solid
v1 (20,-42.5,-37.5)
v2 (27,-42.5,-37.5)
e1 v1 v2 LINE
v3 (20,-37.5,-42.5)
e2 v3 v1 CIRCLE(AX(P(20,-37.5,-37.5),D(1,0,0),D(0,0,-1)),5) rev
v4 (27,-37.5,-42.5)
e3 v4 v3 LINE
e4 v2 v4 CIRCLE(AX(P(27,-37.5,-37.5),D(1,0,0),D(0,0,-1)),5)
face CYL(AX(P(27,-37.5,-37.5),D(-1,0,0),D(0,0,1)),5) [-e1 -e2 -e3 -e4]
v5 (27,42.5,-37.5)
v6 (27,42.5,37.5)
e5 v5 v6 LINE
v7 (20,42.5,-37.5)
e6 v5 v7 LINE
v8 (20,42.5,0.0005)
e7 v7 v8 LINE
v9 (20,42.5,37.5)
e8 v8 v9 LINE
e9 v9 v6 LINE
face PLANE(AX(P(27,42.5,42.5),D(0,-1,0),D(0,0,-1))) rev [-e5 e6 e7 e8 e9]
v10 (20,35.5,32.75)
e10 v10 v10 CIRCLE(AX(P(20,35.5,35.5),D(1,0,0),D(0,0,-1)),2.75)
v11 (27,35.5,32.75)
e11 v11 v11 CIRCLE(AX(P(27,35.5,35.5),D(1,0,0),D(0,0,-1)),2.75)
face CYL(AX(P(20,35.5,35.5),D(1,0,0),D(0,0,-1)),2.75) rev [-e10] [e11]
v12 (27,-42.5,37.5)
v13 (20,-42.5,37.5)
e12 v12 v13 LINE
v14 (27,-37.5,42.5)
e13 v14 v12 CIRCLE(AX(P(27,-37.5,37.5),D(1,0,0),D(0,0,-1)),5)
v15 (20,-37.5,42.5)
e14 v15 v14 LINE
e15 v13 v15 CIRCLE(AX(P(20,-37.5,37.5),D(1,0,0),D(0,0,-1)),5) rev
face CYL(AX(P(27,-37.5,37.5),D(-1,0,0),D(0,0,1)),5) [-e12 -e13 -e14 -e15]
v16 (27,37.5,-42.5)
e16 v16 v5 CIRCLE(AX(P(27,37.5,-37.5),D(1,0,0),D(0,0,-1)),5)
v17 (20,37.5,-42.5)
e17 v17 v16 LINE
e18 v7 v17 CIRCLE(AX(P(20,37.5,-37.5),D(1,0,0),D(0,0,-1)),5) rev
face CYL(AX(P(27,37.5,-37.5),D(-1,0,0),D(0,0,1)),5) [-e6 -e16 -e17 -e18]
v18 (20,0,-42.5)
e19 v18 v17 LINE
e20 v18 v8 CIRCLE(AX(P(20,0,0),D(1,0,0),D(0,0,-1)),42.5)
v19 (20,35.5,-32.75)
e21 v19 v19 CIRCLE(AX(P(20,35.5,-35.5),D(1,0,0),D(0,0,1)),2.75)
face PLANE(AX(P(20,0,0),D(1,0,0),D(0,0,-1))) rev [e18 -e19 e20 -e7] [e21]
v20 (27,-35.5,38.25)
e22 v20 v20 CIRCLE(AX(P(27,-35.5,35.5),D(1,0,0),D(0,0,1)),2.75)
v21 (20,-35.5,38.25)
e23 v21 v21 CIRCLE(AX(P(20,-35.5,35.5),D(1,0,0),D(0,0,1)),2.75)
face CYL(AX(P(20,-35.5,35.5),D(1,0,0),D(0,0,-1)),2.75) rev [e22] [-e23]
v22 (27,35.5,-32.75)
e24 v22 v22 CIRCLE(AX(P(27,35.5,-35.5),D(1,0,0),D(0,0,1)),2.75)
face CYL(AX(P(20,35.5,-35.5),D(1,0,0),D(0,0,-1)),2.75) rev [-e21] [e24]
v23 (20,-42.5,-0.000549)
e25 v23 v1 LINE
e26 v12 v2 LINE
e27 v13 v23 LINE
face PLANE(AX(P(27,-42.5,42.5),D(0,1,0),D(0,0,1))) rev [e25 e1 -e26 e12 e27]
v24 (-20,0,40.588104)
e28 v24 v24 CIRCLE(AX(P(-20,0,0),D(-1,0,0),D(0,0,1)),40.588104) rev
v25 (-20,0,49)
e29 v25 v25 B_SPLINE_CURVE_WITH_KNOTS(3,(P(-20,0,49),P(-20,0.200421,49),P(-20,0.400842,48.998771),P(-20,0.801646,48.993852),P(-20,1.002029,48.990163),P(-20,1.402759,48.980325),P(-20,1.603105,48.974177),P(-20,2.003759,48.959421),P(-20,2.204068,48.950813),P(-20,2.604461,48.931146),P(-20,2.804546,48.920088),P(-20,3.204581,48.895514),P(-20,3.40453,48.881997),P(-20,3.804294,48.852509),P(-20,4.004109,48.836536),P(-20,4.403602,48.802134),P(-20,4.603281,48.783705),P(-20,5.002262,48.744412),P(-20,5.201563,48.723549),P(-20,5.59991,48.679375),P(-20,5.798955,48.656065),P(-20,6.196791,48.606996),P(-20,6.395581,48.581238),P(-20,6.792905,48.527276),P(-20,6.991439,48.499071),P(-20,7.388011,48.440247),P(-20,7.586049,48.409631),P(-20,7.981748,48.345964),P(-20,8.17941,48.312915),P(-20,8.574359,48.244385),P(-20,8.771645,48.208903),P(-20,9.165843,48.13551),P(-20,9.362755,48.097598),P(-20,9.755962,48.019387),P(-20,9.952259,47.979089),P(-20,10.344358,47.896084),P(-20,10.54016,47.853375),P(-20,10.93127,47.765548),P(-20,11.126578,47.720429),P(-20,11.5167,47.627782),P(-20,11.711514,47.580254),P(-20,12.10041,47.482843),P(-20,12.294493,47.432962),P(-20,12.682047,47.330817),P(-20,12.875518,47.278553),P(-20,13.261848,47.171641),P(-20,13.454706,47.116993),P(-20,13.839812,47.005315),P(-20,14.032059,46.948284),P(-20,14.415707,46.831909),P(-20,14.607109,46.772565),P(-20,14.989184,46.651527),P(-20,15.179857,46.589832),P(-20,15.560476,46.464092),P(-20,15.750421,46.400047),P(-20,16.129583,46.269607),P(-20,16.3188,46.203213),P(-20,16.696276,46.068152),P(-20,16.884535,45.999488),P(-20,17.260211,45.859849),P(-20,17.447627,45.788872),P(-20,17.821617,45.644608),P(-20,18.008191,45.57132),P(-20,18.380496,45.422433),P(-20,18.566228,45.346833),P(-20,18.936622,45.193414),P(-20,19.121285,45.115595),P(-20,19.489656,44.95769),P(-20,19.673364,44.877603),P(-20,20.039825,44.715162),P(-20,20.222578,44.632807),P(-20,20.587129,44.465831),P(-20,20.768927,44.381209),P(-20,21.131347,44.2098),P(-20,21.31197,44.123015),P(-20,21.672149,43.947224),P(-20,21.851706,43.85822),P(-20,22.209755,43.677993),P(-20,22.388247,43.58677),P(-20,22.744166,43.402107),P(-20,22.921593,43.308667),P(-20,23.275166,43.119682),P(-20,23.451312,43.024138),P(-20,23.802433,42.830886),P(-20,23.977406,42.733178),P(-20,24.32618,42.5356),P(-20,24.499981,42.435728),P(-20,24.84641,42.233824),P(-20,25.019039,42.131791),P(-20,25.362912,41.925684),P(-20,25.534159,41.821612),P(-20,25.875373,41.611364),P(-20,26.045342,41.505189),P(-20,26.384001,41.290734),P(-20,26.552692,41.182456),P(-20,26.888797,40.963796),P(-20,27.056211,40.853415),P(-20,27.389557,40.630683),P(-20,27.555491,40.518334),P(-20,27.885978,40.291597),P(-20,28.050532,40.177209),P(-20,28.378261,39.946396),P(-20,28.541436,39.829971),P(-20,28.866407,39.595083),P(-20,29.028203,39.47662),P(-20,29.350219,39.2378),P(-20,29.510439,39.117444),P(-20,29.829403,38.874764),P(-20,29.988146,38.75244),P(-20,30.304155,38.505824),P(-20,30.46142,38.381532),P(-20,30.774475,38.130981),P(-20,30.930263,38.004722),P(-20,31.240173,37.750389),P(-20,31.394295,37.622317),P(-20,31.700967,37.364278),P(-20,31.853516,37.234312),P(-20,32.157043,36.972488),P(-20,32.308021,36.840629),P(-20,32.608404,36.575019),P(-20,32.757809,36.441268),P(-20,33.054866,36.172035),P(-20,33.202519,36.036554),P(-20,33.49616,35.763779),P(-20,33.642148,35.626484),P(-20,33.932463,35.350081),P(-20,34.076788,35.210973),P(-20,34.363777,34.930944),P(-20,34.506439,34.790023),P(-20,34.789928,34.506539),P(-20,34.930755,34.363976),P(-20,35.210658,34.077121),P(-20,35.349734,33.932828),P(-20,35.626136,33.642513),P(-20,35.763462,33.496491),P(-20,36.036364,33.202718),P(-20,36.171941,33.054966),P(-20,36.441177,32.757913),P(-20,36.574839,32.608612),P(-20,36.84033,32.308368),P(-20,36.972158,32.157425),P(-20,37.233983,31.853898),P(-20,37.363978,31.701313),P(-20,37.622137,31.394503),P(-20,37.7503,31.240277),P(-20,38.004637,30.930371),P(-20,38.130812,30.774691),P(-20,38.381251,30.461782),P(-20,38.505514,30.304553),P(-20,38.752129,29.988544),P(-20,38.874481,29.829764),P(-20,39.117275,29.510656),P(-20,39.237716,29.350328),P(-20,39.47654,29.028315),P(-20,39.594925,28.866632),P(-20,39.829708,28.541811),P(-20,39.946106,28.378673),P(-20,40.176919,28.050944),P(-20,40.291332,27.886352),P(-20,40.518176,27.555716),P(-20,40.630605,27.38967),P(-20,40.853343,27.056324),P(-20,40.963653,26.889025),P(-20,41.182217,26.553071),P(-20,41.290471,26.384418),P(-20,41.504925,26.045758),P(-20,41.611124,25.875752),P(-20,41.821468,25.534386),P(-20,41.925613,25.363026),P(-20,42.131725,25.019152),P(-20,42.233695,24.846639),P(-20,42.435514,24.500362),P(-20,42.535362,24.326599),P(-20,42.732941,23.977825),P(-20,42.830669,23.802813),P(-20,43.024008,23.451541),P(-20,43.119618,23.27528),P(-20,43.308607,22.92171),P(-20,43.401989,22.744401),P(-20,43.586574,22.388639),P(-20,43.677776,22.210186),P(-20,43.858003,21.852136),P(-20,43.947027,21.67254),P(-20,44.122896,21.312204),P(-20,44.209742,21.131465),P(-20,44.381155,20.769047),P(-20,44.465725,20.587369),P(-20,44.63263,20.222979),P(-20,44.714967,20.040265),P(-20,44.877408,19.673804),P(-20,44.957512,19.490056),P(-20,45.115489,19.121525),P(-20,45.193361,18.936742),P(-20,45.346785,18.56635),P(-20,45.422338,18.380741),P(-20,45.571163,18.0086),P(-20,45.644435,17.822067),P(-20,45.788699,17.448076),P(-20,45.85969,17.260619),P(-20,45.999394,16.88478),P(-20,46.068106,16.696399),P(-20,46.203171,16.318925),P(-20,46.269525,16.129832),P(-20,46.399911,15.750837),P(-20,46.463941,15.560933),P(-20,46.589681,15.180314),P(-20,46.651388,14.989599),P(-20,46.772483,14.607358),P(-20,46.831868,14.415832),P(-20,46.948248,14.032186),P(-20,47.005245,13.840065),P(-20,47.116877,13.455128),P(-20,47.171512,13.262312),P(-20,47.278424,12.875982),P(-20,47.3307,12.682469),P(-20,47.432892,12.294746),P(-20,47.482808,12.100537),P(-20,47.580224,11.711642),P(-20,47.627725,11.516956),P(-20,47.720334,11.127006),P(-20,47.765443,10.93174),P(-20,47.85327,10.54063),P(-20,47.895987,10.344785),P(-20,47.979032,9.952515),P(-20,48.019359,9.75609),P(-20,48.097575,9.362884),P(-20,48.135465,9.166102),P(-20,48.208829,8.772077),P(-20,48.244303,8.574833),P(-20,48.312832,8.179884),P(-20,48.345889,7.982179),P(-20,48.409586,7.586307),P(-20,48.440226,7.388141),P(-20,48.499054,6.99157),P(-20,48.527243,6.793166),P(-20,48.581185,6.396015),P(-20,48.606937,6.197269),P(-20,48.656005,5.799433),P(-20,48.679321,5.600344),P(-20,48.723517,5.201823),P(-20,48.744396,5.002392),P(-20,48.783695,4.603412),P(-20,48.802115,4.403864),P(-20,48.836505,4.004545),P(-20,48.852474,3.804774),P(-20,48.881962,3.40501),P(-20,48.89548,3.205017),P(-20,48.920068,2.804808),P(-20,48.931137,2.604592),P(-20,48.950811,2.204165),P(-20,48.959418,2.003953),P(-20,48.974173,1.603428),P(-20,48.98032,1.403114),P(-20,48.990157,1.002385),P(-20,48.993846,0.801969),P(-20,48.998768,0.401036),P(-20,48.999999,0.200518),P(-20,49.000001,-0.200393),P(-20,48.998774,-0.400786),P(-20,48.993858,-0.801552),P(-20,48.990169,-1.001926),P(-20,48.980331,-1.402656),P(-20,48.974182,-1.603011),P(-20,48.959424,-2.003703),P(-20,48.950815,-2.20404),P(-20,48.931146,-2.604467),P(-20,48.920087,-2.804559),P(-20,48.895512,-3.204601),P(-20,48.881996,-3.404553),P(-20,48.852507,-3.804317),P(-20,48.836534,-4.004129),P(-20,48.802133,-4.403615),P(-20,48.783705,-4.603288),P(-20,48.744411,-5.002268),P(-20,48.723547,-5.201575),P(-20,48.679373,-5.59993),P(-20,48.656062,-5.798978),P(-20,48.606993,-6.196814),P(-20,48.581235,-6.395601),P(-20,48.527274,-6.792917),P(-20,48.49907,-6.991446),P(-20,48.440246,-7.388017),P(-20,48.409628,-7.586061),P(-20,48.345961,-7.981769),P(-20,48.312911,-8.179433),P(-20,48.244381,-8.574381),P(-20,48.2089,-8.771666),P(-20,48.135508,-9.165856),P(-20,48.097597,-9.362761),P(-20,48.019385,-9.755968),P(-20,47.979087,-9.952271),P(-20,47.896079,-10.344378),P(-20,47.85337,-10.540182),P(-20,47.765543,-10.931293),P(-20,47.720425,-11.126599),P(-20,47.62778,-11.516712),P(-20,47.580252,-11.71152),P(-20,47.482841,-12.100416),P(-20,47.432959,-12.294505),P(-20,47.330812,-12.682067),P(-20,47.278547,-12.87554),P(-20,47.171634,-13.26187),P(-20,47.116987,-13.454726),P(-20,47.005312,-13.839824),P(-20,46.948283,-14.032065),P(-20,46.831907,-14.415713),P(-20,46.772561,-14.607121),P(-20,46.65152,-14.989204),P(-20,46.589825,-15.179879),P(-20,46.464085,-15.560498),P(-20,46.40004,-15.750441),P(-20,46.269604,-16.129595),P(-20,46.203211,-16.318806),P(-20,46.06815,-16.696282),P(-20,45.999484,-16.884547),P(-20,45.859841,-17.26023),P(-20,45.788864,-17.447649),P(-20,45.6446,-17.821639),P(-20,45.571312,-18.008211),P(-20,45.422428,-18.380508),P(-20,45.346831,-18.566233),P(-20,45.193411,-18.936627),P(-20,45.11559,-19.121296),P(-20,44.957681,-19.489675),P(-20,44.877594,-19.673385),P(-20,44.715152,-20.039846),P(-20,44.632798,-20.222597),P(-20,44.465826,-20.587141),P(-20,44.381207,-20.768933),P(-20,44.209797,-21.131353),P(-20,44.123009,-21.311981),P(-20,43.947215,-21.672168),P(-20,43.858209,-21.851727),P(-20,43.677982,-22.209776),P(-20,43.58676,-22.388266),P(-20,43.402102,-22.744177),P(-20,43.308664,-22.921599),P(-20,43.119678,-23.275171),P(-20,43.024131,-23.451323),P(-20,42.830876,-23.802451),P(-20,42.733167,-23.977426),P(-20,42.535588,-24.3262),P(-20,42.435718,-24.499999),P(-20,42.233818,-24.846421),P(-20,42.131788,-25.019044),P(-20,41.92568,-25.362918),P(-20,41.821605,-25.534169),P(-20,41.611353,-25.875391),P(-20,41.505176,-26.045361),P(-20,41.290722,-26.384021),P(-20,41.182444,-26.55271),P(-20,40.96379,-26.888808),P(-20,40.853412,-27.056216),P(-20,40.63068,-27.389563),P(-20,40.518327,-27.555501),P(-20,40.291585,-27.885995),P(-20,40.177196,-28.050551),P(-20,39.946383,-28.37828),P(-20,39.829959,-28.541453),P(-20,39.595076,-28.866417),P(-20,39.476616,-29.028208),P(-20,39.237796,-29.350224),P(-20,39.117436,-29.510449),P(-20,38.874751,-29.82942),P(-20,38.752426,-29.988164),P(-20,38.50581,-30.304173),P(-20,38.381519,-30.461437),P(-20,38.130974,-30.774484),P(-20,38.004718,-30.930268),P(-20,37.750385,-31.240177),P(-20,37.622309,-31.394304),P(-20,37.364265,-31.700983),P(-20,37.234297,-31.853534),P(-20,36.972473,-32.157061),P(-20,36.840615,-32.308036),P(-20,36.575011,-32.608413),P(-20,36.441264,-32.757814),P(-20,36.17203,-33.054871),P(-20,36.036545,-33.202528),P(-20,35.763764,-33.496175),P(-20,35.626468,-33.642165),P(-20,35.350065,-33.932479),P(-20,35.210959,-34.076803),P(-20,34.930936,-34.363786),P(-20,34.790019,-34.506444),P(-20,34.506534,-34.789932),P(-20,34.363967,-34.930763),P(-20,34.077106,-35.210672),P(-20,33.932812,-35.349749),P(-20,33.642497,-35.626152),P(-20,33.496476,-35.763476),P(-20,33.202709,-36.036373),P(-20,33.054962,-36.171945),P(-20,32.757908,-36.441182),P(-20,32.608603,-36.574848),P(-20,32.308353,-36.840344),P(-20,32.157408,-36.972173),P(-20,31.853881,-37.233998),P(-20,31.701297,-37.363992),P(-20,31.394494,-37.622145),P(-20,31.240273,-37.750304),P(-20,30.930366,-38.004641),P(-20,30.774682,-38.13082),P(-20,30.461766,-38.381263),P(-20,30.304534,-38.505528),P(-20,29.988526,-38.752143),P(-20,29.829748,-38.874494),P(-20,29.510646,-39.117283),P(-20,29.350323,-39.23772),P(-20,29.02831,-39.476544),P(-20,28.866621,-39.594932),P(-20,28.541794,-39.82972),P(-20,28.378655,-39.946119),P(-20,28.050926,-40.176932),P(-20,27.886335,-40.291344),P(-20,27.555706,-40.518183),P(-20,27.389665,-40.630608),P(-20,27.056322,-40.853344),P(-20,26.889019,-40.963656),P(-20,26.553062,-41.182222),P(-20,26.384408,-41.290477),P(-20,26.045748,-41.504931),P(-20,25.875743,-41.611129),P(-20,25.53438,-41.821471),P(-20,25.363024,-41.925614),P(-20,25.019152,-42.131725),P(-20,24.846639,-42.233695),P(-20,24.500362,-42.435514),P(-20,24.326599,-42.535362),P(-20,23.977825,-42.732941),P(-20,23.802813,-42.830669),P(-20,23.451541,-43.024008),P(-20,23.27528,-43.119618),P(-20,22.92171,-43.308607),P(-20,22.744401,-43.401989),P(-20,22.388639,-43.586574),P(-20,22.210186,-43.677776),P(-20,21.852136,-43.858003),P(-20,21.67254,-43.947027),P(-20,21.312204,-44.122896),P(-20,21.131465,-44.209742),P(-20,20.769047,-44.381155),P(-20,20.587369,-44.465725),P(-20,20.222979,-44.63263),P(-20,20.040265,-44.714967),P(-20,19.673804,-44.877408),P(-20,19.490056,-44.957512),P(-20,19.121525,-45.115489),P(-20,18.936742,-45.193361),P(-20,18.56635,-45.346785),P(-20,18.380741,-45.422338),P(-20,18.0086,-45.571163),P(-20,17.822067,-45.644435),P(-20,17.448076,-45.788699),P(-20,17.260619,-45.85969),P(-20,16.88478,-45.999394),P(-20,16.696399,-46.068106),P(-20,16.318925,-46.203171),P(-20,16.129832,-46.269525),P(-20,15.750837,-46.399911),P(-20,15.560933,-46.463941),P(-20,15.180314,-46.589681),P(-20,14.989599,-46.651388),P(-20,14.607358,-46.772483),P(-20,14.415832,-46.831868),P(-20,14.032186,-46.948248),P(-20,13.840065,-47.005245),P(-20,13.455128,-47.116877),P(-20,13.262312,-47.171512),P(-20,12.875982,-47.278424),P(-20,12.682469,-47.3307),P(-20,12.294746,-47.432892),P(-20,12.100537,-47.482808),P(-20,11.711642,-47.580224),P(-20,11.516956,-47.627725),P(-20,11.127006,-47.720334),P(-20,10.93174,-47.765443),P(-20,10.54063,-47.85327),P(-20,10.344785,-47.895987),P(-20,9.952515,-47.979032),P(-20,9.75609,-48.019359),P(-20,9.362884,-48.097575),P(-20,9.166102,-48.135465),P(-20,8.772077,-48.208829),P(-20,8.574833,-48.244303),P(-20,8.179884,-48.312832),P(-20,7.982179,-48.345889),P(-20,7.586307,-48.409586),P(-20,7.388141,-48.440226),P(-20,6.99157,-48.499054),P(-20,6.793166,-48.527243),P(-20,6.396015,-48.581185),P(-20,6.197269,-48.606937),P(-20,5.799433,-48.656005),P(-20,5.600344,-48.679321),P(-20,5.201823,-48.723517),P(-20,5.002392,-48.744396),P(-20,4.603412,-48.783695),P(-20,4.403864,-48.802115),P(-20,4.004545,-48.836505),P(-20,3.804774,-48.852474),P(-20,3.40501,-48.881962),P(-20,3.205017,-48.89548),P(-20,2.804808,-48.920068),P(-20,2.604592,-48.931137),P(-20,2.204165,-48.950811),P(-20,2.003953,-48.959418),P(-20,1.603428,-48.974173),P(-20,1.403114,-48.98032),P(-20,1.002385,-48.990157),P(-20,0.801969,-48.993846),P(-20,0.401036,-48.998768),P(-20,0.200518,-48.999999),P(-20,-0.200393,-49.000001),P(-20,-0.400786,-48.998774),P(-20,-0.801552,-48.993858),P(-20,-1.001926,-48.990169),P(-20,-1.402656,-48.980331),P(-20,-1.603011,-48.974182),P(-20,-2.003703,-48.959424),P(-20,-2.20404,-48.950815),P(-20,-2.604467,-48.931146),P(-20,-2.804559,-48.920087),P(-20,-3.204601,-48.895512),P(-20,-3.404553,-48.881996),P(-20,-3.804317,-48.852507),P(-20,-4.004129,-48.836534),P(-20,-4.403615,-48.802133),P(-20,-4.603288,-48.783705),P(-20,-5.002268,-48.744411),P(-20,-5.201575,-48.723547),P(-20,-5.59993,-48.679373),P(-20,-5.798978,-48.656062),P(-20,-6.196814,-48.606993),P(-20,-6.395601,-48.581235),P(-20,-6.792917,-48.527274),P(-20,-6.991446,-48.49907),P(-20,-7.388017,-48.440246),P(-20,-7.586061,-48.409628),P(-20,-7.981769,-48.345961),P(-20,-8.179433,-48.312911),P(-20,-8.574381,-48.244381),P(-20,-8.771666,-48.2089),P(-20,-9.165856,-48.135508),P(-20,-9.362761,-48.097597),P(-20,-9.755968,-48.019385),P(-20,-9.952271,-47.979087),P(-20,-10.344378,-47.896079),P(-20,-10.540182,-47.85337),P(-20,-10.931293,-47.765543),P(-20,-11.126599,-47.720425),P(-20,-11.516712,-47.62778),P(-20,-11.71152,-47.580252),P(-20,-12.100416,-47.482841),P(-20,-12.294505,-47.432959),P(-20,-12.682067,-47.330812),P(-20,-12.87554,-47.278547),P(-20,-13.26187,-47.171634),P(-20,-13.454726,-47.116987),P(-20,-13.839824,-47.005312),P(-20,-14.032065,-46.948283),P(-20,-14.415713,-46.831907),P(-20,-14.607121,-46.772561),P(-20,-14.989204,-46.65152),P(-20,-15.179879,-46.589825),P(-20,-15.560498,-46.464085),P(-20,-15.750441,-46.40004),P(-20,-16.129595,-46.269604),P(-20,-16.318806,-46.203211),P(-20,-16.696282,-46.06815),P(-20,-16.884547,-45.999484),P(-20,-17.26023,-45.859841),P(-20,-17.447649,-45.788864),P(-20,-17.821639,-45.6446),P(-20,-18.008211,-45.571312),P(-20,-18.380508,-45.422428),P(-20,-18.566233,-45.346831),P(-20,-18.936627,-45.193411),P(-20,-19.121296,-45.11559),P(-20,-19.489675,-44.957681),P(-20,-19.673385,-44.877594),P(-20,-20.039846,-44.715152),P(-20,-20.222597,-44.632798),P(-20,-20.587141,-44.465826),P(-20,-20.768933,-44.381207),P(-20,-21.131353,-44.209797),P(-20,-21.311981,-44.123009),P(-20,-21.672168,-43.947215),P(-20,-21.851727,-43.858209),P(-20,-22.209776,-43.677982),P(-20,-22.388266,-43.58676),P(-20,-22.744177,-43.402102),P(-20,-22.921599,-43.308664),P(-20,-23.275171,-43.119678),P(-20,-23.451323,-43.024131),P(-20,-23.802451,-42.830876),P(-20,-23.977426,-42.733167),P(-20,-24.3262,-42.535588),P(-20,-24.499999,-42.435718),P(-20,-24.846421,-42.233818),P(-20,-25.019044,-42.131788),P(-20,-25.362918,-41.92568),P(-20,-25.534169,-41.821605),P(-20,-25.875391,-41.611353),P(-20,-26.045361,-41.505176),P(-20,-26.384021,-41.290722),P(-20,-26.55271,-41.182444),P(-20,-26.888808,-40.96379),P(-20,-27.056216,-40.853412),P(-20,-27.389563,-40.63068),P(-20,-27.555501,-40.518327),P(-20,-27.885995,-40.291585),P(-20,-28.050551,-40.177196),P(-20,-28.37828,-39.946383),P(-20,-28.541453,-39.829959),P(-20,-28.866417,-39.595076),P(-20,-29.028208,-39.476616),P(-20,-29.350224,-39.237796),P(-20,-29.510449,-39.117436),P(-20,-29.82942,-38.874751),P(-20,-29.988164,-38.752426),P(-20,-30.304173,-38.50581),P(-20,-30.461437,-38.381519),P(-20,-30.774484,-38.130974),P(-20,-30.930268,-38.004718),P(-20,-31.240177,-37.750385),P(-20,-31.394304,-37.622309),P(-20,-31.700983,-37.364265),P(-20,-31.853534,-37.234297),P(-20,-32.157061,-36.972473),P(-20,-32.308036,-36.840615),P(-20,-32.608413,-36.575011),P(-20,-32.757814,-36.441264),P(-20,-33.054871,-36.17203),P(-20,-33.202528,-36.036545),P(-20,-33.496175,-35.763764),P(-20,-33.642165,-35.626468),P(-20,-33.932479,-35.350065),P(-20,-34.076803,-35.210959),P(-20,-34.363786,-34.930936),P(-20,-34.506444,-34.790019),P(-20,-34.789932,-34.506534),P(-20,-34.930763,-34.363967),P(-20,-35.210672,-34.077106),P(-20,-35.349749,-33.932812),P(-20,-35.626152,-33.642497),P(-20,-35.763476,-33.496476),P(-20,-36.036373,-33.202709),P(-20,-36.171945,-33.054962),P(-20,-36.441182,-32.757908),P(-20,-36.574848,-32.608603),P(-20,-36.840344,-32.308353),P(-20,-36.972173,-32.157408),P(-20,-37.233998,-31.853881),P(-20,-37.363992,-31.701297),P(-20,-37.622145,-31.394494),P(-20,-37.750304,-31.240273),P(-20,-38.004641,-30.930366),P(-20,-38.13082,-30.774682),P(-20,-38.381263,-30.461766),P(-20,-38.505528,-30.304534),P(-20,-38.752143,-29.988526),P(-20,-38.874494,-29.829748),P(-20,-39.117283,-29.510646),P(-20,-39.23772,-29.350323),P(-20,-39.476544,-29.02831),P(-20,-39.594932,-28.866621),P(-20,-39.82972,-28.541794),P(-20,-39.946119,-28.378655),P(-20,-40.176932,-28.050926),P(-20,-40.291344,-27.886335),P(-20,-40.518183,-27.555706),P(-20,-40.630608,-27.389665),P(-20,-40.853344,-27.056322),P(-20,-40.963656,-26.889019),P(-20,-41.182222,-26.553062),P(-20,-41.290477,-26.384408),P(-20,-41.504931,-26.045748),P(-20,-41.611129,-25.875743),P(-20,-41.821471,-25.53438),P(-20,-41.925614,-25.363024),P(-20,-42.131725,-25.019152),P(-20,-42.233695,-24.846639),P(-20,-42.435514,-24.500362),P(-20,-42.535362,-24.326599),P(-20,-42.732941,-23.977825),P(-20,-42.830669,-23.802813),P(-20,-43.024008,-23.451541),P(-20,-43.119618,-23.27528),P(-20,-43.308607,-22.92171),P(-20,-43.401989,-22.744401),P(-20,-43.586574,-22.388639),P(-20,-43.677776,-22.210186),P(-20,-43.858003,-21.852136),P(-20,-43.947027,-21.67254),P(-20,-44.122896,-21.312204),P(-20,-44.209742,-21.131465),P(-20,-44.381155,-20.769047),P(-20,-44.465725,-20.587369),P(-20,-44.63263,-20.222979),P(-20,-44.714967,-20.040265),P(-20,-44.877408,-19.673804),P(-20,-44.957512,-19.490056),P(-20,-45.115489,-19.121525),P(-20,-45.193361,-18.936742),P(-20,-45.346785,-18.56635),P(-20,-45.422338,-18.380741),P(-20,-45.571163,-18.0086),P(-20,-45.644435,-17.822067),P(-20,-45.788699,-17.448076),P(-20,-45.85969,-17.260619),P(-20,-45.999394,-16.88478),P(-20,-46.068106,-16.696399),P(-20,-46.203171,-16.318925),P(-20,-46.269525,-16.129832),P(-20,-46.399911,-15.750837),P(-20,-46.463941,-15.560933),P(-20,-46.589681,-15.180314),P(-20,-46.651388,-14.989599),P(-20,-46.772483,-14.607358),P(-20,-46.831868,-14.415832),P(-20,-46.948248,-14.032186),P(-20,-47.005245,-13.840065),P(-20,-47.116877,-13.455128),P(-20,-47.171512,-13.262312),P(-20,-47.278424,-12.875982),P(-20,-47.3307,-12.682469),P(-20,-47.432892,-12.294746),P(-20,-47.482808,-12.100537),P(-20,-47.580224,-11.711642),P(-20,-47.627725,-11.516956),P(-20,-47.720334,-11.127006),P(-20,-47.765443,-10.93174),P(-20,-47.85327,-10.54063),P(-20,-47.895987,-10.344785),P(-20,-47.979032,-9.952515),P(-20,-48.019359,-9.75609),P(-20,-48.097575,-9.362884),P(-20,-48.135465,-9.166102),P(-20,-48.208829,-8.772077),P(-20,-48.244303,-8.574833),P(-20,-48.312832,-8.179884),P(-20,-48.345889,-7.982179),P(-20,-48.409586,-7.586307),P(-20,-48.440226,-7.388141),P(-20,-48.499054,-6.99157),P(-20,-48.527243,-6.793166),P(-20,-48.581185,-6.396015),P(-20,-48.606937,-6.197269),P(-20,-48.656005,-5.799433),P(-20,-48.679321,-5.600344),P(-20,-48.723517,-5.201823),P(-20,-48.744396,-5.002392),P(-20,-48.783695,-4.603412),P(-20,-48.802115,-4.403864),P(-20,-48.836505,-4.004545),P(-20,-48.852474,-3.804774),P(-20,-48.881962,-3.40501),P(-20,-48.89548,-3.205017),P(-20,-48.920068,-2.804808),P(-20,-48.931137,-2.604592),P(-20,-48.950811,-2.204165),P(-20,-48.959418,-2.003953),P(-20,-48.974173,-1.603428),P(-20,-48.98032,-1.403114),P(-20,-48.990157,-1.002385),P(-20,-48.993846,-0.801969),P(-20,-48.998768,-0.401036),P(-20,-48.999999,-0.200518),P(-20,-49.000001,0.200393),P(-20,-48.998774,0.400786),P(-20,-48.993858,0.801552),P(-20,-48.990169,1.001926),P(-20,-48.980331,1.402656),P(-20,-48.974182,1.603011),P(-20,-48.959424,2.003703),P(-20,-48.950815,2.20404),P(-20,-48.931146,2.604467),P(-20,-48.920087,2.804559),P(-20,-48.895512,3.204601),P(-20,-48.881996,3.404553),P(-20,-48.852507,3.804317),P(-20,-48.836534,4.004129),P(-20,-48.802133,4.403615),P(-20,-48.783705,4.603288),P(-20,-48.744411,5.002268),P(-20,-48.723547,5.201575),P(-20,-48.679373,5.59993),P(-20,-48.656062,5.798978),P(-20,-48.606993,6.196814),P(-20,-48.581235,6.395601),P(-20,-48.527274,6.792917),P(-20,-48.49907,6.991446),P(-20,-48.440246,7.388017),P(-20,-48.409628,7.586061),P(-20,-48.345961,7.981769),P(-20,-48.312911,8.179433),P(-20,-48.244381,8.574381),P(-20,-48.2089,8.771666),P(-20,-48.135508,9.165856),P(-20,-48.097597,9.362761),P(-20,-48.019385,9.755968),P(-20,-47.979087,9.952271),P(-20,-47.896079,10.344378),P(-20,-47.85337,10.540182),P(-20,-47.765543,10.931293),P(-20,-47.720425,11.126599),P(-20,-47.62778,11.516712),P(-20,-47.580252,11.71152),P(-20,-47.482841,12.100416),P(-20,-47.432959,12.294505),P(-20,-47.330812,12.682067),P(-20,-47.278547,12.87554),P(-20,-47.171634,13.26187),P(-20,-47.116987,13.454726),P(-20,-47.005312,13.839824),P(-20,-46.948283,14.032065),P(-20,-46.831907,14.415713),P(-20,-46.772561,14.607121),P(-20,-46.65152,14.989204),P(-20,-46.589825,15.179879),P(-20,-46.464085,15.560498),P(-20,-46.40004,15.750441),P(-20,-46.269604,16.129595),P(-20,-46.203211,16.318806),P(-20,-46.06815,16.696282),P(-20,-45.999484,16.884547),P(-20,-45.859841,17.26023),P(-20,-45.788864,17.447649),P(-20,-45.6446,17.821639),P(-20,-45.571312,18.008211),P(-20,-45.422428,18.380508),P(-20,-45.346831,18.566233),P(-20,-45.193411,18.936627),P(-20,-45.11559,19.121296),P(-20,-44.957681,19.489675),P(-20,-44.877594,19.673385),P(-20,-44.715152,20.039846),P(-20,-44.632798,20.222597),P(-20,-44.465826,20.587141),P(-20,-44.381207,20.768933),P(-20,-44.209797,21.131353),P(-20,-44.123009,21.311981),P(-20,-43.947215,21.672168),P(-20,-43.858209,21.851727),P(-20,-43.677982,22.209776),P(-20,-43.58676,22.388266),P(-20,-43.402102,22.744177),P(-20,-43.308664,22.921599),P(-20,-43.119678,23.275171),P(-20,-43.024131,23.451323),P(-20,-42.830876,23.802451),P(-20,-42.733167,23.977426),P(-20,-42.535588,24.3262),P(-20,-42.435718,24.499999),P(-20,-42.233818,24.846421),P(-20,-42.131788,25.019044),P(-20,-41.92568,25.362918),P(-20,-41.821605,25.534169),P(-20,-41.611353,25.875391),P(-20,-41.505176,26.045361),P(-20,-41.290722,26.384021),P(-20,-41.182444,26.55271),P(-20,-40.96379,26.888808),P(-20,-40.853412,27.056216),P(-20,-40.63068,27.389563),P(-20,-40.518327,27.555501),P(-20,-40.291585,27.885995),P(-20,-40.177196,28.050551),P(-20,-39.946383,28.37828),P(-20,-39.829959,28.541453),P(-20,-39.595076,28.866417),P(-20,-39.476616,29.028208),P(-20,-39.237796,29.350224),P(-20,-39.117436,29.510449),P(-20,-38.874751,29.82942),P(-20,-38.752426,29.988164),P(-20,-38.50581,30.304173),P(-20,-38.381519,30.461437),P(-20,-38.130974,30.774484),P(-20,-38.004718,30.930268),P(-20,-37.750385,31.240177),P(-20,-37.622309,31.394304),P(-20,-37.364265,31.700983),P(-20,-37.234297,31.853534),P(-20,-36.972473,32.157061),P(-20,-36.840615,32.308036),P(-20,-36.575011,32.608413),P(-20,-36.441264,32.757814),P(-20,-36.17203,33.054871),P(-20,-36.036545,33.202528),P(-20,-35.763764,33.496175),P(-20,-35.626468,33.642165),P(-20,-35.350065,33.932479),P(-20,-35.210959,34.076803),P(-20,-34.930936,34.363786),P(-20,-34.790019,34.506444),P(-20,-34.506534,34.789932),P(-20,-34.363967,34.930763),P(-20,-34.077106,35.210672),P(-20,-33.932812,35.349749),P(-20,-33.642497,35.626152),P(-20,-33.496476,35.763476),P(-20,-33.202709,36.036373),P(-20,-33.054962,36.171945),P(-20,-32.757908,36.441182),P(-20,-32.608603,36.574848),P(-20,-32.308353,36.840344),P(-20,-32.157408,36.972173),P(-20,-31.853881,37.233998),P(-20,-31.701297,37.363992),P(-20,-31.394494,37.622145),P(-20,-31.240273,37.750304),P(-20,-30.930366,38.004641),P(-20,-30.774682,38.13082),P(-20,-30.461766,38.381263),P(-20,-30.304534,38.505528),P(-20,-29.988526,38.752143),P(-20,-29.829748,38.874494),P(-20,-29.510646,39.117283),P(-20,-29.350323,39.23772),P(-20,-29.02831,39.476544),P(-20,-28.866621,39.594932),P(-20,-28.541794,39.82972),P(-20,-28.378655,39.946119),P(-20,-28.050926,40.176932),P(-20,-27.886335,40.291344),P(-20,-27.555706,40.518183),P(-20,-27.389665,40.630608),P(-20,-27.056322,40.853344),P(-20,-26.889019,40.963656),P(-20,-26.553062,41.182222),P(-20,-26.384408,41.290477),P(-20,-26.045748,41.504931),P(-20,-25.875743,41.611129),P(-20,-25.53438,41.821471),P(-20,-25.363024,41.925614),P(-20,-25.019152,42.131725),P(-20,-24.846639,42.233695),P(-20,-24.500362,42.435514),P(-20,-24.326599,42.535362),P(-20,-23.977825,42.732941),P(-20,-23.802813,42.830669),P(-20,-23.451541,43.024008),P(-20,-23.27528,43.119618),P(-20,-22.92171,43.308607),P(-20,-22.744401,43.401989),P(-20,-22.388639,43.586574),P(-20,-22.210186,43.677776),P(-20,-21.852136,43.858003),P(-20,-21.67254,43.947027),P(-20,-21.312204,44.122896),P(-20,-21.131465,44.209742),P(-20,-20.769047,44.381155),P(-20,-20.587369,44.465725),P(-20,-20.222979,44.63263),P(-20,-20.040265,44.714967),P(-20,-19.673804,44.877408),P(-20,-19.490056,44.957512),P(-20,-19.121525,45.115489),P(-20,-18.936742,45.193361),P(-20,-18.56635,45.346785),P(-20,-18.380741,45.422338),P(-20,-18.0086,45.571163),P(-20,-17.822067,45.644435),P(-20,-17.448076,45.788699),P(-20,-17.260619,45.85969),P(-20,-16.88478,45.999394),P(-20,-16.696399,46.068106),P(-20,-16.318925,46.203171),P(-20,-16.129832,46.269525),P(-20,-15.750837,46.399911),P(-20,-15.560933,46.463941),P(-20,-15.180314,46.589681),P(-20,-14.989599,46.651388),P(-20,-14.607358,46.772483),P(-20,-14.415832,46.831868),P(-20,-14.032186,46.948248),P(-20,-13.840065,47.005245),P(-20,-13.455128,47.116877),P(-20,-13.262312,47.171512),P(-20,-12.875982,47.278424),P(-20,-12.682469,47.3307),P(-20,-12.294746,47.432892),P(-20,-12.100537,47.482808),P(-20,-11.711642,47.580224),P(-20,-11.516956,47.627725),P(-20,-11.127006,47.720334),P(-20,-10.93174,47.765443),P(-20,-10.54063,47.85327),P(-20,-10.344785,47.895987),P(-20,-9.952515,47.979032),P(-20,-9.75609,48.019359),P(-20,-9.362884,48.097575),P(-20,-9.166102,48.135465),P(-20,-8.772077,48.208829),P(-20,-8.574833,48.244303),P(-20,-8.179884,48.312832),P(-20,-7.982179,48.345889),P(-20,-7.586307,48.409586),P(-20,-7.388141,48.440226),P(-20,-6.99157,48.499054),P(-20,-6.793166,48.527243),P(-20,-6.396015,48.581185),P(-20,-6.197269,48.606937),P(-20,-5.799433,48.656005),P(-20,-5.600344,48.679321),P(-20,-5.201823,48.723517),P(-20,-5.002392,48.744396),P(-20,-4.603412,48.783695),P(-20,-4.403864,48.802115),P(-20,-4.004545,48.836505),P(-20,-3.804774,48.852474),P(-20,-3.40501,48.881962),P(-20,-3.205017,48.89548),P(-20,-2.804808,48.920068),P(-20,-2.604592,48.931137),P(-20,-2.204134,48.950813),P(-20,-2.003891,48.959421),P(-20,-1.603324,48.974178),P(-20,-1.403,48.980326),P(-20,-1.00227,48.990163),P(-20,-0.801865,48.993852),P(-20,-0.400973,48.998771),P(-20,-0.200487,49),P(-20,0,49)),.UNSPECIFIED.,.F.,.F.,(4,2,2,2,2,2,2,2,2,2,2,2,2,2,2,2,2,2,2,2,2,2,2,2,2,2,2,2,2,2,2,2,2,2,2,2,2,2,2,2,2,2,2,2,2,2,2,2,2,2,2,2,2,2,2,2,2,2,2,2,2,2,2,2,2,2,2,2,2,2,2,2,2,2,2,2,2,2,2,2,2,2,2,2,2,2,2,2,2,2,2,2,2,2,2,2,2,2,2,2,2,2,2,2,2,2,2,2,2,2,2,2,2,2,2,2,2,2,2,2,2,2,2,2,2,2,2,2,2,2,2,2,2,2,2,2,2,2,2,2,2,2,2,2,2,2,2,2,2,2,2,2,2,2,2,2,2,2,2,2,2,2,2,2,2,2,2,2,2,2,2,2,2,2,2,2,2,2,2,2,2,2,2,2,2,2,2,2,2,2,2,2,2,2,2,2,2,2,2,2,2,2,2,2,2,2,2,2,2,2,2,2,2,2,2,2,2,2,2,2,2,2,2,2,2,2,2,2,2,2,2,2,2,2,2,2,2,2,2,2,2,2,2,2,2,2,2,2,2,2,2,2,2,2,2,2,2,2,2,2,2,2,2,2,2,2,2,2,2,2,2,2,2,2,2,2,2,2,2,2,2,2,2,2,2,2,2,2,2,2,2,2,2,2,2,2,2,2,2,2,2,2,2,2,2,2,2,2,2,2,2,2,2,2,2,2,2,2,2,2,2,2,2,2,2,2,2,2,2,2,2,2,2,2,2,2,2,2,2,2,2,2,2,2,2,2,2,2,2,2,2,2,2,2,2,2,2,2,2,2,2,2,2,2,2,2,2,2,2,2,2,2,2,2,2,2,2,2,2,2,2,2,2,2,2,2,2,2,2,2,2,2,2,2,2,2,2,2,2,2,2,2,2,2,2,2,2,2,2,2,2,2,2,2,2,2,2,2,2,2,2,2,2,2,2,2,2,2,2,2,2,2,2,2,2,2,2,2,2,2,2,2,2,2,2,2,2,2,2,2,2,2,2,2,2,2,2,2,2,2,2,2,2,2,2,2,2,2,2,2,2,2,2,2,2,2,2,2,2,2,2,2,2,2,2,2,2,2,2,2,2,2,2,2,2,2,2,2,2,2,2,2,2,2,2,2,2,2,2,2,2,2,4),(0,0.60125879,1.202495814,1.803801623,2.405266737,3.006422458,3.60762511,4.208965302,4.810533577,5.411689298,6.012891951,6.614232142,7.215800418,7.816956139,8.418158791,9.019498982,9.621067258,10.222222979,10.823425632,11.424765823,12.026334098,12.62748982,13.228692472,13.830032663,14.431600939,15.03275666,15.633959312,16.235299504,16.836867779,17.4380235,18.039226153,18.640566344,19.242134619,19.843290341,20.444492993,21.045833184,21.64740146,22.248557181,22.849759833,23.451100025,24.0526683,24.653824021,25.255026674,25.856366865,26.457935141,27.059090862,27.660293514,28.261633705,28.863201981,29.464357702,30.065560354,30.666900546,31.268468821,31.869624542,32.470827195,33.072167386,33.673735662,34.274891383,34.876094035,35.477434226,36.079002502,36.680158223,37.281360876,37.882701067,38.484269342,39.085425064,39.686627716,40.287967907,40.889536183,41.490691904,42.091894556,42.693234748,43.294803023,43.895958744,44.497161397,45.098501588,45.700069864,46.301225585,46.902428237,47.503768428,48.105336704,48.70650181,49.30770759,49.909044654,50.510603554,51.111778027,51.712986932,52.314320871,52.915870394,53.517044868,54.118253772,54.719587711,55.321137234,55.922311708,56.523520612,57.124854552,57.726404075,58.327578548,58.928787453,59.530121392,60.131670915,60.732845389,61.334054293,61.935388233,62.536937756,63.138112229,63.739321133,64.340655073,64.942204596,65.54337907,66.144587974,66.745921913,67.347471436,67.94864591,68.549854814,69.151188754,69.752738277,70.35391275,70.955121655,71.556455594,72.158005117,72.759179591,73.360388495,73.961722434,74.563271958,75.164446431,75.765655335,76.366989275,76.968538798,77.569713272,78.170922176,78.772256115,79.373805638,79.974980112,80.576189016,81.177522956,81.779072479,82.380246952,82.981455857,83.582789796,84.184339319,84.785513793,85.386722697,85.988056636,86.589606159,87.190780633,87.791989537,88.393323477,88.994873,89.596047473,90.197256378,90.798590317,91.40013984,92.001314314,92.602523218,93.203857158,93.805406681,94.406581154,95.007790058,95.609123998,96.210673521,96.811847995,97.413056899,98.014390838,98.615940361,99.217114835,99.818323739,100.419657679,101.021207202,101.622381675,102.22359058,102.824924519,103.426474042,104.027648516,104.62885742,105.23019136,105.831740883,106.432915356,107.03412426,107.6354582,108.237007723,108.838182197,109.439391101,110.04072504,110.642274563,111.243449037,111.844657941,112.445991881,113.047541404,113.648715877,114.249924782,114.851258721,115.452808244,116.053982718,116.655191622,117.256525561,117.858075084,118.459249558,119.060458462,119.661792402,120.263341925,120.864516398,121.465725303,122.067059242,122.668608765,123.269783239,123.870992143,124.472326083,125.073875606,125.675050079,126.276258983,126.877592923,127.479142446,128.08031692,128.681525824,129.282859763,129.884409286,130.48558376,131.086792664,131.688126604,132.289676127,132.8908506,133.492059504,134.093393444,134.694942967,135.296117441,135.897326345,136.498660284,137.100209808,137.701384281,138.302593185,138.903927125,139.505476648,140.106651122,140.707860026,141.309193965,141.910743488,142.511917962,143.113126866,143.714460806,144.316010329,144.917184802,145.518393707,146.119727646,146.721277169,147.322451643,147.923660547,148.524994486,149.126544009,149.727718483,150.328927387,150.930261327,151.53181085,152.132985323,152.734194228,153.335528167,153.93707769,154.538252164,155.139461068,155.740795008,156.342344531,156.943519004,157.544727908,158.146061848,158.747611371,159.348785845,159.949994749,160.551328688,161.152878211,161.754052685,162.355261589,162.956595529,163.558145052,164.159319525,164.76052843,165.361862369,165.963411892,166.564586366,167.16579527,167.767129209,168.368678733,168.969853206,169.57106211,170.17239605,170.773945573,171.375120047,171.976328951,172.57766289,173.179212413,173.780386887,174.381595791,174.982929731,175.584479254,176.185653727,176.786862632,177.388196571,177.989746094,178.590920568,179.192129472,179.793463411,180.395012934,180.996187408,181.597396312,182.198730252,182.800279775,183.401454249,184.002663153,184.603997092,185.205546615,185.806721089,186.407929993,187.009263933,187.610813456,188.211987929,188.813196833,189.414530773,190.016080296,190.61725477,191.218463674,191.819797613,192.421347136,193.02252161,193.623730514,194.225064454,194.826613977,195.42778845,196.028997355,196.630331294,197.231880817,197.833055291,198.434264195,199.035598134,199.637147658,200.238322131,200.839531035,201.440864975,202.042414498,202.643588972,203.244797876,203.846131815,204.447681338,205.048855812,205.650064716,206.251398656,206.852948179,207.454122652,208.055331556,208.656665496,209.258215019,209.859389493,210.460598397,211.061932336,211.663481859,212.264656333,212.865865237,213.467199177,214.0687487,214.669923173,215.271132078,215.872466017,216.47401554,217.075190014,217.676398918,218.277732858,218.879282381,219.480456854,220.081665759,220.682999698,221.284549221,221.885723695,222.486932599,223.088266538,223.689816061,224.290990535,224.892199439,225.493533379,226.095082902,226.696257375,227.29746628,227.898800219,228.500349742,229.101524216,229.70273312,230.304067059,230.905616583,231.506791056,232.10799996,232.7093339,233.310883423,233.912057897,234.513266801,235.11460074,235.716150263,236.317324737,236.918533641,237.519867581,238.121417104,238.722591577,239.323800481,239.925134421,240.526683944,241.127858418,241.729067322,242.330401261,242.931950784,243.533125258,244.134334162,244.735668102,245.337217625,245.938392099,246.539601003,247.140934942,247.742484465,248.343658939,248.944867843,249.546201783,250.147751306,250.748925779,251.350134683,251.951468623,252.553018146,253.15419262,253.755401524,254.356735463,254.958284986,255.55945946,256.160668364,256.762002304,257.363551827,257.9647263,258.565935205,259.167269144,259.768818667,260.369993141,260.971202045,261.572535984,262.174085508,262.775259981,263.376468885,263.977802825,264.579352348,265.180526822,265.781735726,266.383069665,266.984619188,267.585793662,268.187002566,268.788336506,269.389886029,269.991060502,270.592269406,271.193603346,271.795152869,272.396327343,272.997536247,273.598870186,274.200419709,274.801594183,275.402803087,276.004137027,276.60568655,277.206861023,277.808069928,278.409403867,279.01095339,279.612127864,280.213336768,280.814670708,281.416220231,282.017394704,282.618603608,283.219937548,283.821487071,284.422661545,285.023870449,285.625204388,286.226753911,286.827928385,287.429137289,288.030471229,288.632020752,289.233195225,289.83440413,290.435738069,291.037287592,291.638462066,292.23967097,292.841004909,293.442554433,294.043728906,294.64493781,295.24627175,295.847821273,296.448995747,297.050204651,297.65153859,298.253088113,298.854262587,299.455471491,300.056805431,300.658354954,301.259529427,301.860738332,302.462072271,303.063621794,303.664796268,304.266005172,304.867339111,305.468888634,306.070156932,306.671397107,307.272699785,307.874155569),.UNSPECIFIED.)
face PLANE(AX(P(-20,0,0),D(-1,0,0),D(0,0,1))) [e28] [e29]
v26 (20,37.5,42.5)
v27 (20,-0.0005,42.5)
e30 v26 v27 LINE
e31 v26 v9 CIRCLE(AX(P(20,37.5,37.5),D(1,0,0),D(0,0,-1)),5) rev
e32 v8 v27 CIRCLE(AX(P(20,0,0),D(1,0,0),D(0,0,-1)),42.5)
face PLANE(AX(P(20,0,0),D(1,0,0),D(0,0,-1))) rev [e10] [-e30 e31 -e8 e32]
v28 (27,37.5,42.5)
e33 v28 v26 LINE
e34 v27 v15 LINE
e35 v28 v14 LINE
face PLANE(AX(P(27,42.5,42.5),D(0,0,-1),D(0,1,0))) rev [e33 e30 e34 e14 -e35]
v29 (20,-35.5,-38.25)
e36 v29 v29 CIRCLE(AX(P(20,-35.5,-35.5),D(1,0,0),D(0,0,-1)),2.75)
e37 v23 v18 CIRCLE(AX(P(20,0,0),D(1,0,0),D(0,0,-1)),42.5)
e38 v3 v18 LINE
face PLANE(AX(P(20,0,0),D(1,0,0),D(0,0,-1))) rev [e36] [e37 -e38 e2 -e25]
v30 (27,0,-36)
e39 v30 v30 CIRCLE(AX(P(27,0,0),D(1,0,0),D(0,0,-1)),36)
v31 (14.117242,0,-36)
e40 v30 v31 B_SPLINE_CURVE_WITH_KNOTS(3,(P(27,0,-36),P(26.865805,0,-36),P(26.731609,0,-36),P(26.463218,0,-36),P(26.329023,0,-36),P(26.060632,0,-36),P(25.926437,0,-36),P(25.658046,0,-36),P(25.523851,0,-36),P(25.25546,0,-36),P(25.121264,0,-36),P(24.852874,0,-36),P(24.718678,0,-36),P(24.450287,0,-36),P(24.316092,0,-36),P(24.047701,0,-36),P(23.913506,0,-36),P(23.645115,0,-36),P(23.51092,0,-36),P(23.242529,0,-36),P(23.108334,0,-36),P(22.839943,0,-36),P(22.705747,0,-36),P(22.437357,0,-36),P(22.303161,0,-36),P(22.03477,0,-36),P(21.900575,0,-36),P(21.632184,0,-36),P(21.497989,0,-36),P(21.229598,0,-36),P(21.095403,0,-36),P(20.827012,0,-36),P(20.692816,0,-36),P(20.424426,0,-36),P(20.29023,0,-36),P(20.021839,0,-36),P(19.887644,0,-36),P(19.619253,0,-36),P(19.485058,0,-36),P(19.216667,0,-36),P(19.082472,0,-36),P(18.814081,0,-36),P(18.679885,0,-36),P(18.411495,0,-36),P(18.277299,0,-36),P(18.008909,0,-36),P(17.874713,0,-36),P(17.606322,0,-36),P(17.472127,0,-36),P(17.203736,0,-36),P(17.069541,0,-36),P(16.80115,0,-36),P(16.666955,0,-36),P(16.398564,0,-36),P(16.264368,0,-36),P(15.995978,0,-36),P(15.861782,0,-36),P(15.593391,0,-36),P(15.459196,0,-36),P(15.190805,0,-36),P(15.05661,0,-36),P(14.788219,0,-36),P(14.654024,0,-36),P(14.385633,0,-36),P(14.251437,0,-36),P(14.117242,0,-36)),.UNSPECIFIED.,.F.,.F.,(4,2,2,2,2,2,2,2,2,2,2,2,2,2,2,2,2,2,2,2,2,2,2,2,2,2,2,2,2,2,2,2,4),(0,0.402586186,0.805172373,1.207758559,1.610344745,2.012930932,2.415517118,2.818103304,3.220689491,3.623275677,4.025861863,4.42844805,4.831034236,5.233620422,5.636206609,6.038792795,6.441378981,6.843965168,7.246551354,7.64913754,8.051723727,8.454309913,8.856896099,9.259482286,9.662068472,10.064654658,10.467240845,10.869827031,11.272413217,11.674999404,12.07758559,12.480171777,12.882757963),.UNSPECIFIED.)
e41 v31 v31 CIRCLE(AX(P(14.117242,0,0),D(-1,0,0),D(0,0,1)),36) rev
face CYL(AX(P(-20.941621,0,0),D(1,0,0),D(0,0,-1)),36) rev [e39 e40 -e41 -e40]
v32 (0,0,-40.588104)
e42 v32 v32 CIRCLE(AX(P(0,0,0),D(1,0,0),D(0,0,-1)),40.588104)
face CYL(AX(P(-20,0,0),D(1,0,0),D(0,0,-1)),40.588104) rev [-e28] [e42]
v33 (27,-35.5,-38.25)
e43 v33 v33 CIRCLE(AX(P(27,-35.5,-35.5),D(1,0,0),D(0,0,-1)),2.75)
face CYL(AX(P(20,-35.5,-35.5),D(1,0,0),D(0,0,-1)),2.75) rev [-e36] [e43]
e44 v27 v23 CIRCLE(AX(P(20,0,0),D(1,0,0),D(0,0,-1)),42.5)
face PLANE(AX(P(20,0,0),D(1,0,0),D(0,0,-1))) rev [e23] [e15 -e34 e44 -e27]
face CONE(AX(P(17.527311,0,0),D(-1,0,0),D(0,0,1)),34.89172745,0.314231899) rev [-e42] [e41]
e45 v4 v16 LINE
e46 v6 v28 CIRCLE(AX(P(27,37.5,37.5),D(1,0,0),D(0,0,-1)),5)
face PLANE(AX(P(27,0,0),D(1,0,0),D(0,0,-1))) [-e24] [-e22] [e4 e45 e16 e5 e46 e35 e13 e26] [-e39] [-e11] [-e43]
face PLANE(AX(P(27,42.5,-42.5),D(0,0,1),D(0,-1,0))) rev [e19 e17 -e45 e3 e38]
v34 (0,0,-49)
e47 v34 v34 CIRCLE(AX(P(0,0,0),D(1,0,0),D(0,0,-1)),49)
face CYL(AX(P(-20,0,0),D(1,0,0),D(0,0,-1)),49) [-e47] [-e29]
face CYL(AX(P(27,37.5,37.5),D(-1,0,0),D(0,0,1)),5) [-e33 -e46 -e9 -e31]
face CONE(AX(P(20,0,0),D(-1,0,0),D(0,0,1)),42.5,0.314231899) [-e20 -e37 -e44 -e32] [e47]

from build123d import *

# Parameters (mm, degrees)
SKETCH23_W          = 85
SKETCH23_H          = 85
BOSS_EXTRUDE1_DEPTH = 7
SKETCH26_R          = 49
SKETCH26_R_2        = 40.588103662
BOSS_EXTRUDE2_DEPTH = 20
SKETCH28_R          = 36
CUT_EXTRUDE5_DEPTH  = 84.731714422
SKETCH29_R          = 2.75
CUT_EXTRUDE6_DEPTH  = 7
FILLET1_R           = 5
FILLET2_R           = 5


# Read off the part's stored shape, not the designer's step: Loft-Thin1
with BuildPart() as part:
    # Loft-Thin1 outline → Loft-Thin1 (revolve)
    with BuildSketch(Plane.YX):
        Polygon((34.088103662, 20), (40.588103662, 0), (49, 0), (42.5, 20), align=None)
    revolve(axis=Axis((0, 0, 0), (1, 0, 0)))

    # Sketch23 → Boss-Extrude1 (add)
    with BuildSketch(Plane(origin=(20, 0, 0), x_dir=(0, 0, -1), z_dir=(1, 0, 0))):
        Rectangle(SKETCH23_W, SKETCH23_H)
    extrude(amount=BOSS_EXTRUDE1_DEPTH)

    # Sketch26 → Boss-Extrude2 (add)
    with BuildSketch(Plane.ZY):
        with Locations(Location((0, 0, 0), (0, 0, 180))):
            Circle(SKETCH26_R)
        with Locations(Location((0, 0, 0), (0, 0, 180))):
            Circle(SKETCH26_R_2, mode=Mode.SUBTRACT)
    extrude(amount=BOSS_EXTRUDE2_DEPTH)

    # Sketch28 → Cut-Extrude5 (cut, through all)
    with BuildSketch(Plane(origin=(27, 0, 0), x_dir=(0, 0, -1), z_dir=(1, 0, 0))):
        Circle(SKETCH28_R)
    extrude(amount=-CUT_EXTRUDE5_DEPTH, mode=Mode.SUBTRACT)

    # Sketch29 → Cut-Extrude6 (cut)
    with BuildSketch(Plane(origin=(27, 0, 0), x_dir=(0, 0, -1), z_dir=(1, 0, 0))):
        with Locations((-35.5, 35.5)):
            Circle(SKETCH29_R)
        with Locations(Location((35.5, 35.5, 0), (0, 0, 180))):
            Circle(SKETCH29_R)
        with Locations(Location((-35.5, -35.5, 0), (0, 0, 180))):
            Circle(SKETCH29_R)
        with Locations((35.5, -35.5)):
            Circle(SKETCH29_R)
    extrude(amount=-CUT_EXTRUDE6_DEPTH, mode=Mode.SUBTRACT)

    # Fillet1
    fillet1_edges = [part.edges().sort_by_distance(p)[0] for p in [
        (23.5, -42.5, -42.5),
    ]]
    fillet(fillet1_edges, radius=FILLET1_R)

    # Fillet2
    fillet2_edges = [part.edges().sort_by_distance(p)[0] for p in [
        (23.5, -42.5, 42.5),
        (23.5, 42.5, 42.5),
        (23.5, 42.5, -42.5),
    ]]
    fillet(fillet2_edges, radius=FILLET2_R)


solid = part.part
